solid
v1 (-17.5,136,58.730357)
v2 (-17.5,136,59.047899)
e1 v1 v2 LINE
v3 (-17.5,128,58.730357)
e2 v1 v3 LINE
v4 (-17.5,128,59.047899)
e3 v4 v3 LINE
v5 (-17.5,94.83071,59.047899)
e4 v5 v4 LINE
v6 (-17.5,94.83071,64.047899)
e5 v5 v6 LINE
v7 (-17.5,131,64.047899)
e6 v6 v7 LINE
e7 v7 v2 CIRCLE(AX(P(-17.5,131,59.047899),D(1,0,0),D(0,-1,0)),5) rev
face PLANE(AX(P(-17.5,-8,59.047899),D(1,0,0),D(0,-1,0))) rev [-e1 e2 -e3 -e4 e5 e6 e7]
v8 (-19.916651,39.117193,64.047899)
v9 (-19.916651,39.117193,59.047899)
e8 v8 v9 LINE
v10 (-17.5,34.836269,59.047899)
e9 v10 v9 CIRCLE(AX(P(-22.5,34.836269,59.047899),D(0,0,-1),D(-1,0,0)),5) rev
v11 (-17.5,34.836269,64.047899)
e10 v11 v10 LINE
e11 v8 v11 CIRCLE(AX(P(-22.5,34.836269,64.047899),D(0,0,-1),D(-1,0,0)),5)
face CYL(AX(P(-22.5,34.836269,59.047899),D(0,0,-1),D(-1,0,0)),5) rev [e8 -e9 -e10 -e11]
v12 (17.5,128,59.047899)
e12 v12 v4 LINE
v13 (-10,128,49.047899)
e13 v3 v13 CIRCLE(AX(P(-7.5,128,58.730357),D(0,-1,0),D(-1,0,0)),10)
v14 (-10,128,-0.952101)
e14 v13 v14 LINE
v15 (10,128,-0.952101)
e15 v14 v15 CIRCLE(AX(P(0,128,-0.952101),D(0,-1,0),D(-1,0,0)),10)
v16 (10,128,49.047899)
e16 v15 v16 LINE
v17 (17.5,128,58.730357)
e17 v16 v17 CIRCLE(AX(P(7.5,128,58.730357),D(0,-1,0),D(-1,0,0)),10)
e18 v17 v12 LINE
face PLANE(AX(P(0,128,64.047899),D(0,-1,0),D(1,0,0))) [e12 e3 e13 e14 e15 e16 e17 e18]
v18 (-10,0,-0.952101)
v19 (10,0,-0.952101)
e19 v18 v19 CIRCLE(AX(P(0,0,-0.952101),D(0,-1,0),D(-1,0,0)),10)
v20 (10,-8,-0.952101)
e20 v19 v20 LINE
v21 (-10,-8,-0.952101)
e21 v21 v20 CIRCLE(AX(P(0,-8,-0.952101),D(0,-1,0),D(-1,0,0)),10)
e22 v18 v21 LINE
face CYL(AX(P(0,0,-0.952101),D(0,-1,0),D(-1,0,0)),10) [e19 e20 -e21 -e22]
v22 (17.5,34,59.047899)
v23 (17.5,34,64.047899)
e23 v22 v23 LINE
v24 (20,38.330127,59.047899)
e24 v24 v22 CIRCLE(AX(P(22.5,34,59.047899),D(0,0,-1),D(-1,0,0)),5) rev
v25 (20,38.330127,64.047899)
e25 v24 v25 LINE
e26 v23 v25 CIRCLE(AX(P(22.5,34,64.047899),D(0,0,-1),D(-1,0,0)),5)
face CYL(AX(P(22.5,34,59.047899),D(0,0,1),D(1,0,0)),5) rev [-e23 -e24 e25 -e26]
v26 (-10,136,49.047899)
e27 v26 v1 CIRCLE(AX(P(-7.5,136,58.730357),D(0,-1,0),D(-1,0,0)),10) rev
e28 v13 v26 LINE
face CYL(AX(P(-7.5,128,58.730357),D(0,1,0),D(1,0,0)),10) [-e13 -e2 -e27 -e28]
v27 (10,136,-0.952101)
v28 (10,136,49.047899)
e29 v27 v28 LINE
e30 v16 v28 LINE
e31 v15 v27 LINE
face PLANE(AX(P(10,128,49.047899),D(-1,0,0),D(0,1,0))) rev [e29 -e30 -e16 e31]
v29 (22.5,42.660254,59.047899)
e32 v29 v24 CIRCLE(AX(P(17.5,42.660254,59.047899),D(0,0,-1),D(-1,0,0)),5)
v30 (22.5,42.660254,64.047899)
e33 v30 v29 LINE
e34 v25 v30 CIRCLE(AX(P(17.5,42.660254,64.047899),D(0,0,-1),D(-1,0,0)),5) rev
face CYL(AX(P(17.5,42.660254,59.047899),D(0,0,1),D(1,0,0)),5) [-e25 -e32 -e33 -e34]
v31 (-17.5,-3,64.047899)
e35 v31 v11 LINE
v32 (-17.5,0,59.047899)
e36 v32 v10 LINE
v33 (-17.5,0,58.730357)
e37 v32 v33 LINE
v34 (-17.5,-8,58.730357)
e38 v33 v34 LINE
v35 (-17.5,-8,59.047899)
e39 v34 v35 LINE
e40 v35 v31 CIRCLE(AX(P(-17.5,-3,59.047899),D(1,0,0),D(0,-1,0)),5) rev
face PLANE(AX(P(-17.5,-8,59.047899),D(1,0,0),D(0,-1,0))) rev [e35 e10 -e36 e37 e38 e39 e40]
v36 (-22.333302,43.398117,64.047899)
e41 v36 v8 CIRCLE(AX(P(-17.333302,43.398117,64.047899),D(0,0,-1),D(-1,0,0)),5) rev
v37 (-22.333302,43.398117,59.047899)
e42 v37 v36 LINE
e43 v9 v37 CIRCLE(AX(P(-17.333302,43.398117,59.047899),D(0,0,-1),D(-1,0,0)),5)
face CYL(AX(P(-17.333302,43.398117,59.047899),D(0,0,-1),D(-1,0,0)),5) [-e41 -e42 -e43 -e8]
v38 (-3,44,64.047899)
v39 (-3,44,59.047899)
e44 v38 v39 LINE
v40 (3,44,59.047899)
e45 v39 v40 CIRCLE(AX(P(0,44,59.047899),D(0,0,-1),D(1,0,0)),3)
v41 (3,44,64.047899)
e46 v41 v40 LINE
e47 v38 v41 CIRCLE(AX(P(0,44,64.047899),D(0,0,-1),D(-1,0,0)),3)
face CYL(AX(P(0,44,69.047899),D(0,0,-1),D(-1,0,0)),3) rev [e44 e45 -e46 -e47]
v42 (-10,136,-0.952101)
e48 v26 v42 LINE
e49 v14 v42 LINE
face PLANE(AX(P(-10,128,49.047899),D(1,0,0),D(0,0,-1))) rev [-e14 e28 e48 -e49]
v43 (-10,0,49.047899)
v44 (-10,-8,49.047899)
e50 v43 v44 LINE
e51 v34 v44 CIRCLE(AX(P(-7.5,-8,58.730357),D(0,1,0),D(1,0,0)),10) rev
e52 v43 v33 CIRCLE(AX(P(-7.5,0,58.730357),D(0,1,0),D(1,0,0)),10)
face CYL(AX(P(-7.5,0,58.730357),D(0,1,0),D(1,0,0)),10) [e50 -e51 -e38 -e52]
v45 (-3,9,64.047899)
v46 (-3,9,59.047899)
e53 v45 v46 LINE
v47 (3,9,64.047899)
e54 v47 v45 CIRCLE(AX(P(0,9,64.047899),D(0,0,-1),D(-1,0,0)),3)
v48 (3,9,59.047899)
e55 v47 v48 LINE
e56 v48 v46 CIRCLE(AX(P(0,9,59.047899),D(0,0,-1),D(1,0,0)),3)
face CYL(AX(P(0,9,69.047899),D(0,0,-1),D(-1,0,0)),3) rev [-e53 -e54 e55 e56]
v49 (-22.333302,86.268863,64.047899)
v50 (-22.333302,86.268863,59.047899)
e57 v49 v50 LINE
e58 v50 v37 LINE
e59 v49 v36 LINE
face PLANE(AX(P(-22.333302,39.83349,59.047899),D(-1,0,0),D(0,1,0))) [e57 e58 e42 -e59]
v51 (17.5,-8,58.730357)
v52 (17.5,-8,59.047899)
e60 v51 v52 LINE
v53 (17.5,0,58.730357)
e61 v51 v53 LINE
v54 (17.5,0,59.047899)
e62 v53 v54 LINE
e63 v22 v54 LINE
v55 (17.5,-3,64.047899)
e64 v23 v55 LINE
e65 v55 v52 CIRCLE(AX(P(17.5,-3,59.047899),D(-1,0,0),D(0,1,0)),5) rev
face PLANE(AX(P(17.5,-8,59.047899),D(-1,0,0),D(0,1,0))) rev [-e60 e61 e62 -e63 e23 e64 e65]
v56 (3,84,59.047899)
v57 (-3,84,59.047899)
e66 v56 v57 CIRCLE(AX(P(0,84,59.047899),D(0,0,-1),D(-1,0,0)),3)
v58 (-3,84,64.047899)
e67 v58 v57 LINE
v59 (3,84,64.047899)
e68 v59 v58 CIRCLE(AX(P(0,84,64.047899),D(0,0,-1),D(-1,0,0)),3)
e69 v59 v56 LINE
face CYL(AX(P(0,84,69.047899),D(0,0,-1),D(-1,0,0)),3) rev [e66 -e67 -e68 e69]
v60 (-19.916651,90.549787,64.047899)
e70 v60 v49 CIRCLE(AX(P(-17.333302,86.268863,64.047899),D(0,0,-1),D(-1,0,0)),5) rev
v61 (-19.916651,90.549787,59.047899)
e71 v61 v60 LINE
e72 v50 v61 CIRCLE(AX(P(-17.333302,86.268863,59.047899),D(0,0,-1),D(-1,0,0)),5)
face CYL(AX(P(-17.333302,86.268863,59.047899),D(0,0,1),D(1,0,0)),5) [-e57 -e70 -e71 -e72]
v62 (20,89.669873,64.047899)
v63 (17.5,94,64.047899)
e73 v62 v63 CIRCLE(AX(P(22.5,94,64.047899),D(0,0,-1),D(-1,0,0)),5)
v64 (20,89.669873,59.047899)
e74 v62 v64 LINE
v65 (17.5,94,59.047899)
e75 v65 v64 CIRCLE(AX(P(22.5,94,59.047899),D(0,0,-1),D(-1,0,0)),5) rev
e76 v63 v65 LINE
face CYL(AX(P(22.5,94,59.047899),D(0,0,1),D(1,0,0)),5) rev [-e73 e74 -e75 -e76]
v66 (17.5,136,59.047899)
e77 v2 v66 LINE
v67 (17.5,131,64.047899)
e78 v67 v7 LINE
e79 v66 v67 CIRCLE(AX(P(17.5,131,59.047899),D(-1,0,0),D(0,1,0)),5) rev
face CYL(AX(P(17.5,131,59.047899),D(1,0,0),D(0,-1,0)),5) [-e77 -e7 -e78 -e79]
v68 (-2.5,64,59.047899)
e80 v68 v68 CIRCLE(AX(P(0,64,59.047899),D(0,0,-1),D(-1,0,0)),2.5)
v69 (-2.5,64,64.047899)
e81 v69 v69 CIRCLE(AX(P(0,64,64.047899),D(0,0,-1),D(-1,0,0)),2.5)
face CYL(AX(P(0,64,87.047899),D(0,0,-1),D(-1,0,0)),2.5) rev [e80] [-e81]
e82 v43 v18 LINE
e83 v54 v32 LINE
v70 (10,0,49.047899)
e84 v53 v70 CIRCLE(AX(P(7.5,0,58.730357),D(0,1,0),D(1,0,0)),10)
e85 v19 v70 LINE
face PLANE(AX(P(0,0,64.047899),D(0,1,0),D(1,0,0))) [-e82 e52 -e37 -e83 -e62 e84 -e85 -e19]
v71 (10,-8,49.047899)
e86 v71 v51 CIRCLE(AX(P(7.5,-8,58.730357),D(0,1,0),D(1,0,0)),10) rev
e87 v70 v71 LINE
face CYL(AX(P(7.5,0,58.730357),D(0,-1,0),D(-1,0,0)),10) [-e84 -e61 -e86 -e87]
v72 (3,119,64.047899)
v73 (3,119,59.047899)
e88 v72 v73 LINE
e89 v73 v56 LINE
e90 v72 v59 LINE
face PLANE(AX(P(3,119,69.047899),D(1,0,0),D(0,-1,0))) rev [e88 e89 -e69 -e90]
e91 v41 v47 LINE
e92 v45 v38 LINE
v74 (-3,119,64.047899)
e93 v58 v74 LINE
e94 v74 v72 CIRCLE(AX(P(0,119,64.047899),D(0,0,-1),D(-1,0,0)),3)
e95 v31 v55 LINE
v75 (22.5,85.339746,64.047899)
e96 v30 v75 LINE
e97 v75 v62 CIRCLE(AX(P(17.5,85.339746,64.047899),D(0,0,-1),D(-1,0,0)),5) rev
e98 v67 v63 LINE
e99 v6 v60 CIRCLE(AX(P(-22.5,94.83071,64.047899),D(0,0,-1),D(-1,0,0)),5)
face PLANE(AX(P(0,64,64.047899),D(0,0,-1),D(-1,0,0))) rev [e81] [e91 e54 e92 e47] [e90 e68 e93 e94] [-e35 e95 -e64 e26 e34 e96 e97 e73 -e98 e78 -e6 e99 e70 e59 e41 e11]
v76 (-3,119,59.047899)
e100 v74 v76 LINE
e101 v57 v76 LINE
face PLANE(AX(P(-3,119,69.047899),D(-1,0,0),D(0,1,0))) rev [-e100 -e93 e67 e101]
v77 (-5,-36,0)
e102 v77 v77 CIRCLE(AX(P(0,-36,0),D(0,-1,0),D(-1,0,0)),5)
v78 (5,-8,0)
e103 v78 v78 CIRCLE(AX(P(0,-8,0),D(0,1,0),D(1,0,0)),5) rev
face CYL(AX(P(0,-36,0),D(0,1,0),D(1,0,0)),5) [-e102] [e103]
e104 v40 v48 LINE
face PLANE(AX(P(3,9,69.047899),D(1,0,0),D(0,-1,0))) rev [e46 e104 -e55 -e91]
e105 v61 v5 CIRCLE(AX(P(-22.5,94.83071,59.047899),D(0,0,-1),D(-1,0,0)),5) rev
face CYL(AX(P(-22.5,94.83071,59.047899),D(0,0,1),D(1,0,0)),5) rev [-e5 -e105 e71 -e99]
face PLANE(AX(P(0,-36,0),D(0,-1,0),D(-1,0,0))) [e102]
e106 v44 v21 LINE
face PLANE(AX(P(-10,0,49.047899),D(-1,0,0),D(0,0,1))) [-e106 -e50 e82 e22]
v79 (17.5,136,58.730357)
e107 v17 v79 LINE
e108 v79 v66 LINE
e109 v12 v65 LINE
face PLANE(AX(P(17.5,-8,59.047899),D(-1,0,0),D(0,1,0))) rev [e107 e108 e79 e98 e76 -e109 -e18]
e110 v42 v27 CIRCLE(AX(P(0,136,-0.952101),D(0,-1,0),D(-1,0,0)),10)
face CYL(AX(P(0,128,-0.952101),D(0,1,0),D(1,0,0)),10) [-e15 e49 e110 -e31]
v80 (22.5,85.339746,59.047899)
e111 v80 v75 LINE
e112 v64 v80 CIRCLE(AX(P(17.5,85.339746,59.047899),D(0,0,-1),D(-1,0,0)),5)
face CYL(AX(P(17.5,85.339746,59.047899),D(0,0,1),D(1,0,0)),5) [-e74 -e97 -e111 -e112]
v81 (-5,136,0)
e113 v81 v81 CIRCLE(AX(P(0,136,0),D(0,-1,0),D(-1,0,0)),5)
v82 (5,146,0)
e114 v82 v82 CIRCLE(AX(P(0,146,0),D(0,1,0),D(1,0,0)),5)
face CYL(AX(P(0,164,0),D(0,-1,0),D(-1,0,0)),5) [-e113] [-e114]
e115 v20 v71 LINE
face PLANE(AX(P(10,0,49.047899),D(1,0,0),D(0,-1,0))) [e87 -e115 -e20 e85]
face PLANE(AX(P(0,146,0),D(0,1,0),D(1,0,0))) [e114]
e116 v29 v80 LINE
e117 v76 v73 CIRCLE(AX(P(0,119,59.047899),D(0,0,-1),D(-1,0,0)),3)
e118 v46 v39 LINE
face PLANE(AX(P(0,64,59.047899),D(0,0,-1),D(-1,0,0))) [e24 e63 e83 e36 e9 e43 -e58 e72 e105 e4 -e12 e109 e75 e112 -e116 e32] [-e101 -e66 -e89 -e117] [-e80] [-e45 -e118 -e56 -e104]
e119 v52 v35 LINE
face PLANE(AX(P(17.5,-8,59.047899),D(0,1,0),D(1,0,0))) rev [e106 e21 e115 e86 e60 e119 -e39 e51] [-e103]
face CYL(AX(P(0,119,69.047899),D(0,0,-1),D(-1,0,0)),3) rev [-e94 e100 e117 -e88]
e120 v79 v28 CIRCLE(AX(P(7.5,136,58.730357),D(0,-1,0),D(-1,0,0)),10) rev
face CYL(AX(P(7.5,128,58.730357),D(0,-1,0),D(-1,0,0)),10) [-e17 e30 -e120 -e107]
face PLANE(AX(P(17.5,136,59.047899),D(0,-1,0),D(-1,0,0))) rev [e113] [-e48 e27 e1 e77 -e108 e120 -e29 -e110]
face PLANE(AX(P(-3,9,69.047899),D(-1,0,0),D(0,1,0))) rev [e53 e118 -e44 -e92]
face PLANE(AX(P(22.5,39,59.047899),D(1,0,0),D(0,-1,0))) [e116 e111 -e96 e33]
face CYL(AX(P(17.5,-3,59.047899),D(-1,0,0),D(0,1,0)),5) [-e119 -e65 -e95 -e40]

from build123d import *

# Parameters (mm, degrees)
SKETCH1_W             = 144
SKETCH1_H             = 35
BOSS_EXTRUDE1_DEPTH   = 5
BOSS_EXTRUDE2_DEPTH   = 8
FILLET1_R             = 10
BOSS_EXTRUDE3_DEPTH   = 8
SKETCH5_R             = 5
BOSS_EXTRUDE4_DEPTH   = 28
FILLET1_OF_MIRROR1_R  = 10
FILLET3_R             = 5
SKETCH7_R             = 2.5
CUT_EXTRUDE2_DEPTH    = 28
SKETCH8_R             = 5
CUT_EXTRUDE3_DEPTH    = 18
SKETCH9_W             = 50
SKETCH9_H             = 4.833302034
BOSS_EXTRUDE7_DEPTH   = 5
FILLET6_R             = 5
FILLET7_R             = 5
SKETCH10_W            = 50
SKETCH10_H            = 5
BOSS_EXTRUDE8_DEPTH   = 5
FILLET8_R             = 5
FILLET9_R             = 5
CUT_EXTRUDE6_DEPTH    = 10
BODY_MOVE_COPY1_ANGLE = 120


with BuildPart() as part:
    # Sketch1 → Boss-Extrude1 (new body)
    with BuildSketch(Plane(origin=(0, 0, 0), x_dir=(1, 0, 0), z_dir=(0, 1, 0))):
        Rectangle(SKETCH1_W, SKETCH1_H)
    boss_extrude1 = extrude(amount=BOSS_EXTRUDE1_DEPTH)

    # Sketch3 → Boss-Extrude2 (add)
    with BuildSketch(Plane.ZY.offset(72)):
        Polygon((-17.5, 5), (-17.5, 15), (-10, 15), (-10, 55), (10, 55), (10, 15), (17.5, 15), (17.5, 5), (0, 5), align=None)
    boss_extrude2 = extrude(amount=-BOSS_EXTRUDE2_DEPTH)

    # Fillet1
    # the kernel refuses this fillet: 10 mm, written as the material it takes off along each edge
    with BuildSketch(Plane(origin=(-96.206145914, 15, -17.5), x_dir=(0, -1, 0), z_dir=(1, 0, 0))) as fillet1_piece_1:
        with BuildLine():
            CenterArc((9.682458366, -10), FILLET1_R, 90, 75.522487814)
            Line((0, -7.5), (-0.193649167, -7.45))
            ThreePointArc((-0.193649167, -7.45), (-0.2, -3.75), (-0.2, 0))
            Line((-0.2, 0), (0, 0.2))
            Line((0, 0.2), (9.682458366, 0.2))
            Line((9.682458366, 0.2), (9.682458366, 0))
        make_face()
    extrude(amount=56.412291828, mode=Mode.SUBTRACT)
    with BuildSketch(Plane(origin=(-96.206145914, 15, 17.5), x_dir=(0, -1, 0), z_dir=(1, 0, 0))) as fillet1_piece_2:
        with BuildLine():
            CenterArc((9.682458366, 10), FILLET1_R, 194.477512186, 75.522487814)
            Line((0, 7.5), (-0.193649167, 7.45))
            ThreePointArc((-0.193649167, 7.45), (-0.2, 3.75), (-0.2, 0))
            Line((-0.2, 0), (0, -0.2))
            Line((0, -0.2), (9.682458366, -0.2))
            Line((9.682458366, -0.2), (9.682458366, 0))
        make_face()
    extrude(amount=56.412291828, mode=Mode.SUBTRACT)

    # Sketch4 → Boss-Extrude3 (add)
    with BuildSketch(Plane.ZY.offset(72)):
        with BuildLine():
            Line((-10, 55), (-10, 65))
            ThreePointArc((-10, 65), (0, 75), (10, 65))
            Line((10, 65), (10, 55))
            Line((10, 55), (-10, 55))
        make_face()
    boss_extrude3 = extrude(amount=-BOSS_EXTRUDE3_DEPTH)

    # Sketch5 → Boss-Extrude4 (add)
    with BuildSketch(Plane.ZY.offset(72)):
        with Locations(Location((0, 64.047898896, 0), (0, 0, 180))):
            Circle(SKETCH5_R)
    boss_extrude4 = extrude(amount=BOSS_EXTRUDE4_DEPTH)

    # Mirror1: Boss-Extrude1, Boss-Extrude2, Boss-Extrude3, Boss-Extrude4 across plane
    add(boss_extrude1.mirror(Plane(origin=(0, 0, 0), x_dir=(0, 0, 1), z_dir=(1, 0, 0))))
    add(boss_extrude2.mirror(Plane(origin=(0, 0, 0), x_dir=(0, 0, 1), z_dir=(1, 0, 0))))
    add(boss_extrude3.mirror(Plane(origin=(0, 0, 0), x_dir=(0, 0, 1), z_dir=(1, 0, 0))))
    add(boss_extrude4.mirror(Plane(origin=(0, 0, 0), x_dir=(0, 0, 1), z_dir=(1, 0, 0))))

    # Fillet1 of Mirror1
    # the kernel refuses this fillet: 10 mm, written as the material it takes off along each edge
    with BuildSketch(Plane(origin=(96.206145914, 15, -17.5), x_dir=(0, -1, 0), z_dir=(-1, 0, 0))) as fillet1_of_mirror1_piece_1:
        with BuildLine():
            CenterArc((9.682458366, 10), FILLET1_OF_MIRROR1_R, 194.477512186, 75.522487814)
            Line((0, 7.5), (-0.193649167, 7.45))
            ThreePointArc((-0.193649167, 7.45), (-0.2, 3.75), (-0.2, 0))
            Line((-0.2, 0), (0, -0.2))
            Line((0, -0.2), (9.682458366, -0.2))
            Line((9.682458366, -0.2), (9.682458366, 0))
        make_face()
    extrude(amount=56.412291828, mode=Mode.SUBTRACT)
    with BuildSketch(Plane(origin=(96.206145914, 15, 17.5), x_dir=(0, -1, 0), z_dir=(-1, 0, 0))) as fillet1_of_mirror1_piece_2:
        with BuildLine():
            CenterArc((9.682458366, -10), FILLET1_OF_MIRROR1_R, 90, 75.522487814)
            Line((0, -7.5), (-0.193649167, -7.45))
            ThreePointArc((-0.193649167, -7.45), (-0.2, -3.75), (-0.2, 0))
            Line((-0.2, 0), (0, 0.2))
            Line((0, 0.2), (9.682458366, 0.2))
            Line((9.682458366, 0.2), (9.682458366, 0))
        make_face()
    extrude(amount=56.412291828, mode=Mode.SUBTRACT)

    # Fillet3
    fillet3_edges = [part.edges().sort_by_distance(p)[0] for p in [
        (-72, 0, 0),
        (72, 0, 0),
    ]]
    fillet(fillet3_edges, radius=FILLET3_R)

    # Sketch7 → Cut-Extrude2 (cut)
    with BuildSketch(Plane(origin=(0, 5, 0), x_dir=(1, 0, 0), z_dir=(0, 1, 0))):
        with Locations(Location((0, 0, 0), (0, 0, 270))):
            Circle(SKETCH7_R)
    extrude(amount=-CUT_EXTRUDE2_DEPTH, mode=Mode.SUBTRACT)

    # Sketch8 → Cut-Extrude3 (cut)
    with BuildSketch(Plane(origin=(100, 0, 0), x_dir=(0, 0, -1), z_dir=(1, 0, 0))):
        with Locations(Location((0, 64.047898896, 0), (0, 0, 180))):
            Circle(SKETCH8_R)
    extrude(amount=-CUT_EXTRUDE3_DEPTH, mode=Mode.SUBTRACT)

    # Sketch9 → Boss-Extrude7 (add)
    with BuildSketch(Plane.XZ):
        with Locations((0.833489832, 19.916651017)):
            Rectangle(SKETCH9_W, SKETCH9_H)
    extrude(amount=-BOSS_EXTRUDE7_DEPTH)

    # Fillet6
    # the kernel refuses this fillet: 5 mm, written as the material it adds along each edge
    with BuildSketch(Plane(origin=(-24.166510168, 0, 17.5), x_dir=(-1, 0, 0), z_dir=(0, 1, 0))) as fillet6_piece_1:
        with BuildLine():
            CenterArc((4.997220406, 5), FILLET6_R, 181.91057204, 88.08942796)
            Line((0, 4.833302034), (-0.099944408, 4.829968074))
            ThreePointArc((-0.099944408, 4.829968074), (-0.1, 2.416651017), (-0.1, 0))
            Line((-0.1, 0), (0, -0.1))
            Line((0, -0.1), (4.997220406, -0.1))
            Line((4.997220406, -0.1), (4.997220406, 0))
        make_face()
    extrude(amount=5)
    with BuildSketch(Plane(origin=(25.833489832, 0, 17.5), x_dir=(1, 0, 0), z_dir=(0, 1, 0))) as fillet6_piece_2:
        with BuildLine():
            CenterArc((4.997220406, -5), FILLET6_R, 90, 88.08942796)
            Line((0, -4.833302034), (-0.099944408, -4.829968074))
            ThreePointArc((-0.099944408, -4.829968074), (-0.1, -2.416651017), (-0.1, 0))
            Line((-0.1, 0), (0, 0.1))
            Line((0, 0.1), (4.997220406, 0.1))
            Line((4.997220406, 0.1), (4.997220406, 0))
        make_face()
    extrude(amount=5)

    # Fillet7
    fillet7_edges = [part.edges().sort_by_distance(p)[0] for p in [
        (-24.166510168, 2.5, 22.333302034),
        (25.833489832, 2.5, 22.333302034),
    ]]
    fillet(fillet7_edges, radius=FILLET7_R)

    # Sketch10 → Boss-Extrude8 (add)
    with BuildSketch(Plane.XZ):
        with Locations((0, -20)):
            Rectangle(SKETCH10_W, SKETCH10_H)
    extrude(amount=-BOSS_EXTRUDE8_DEPTH)

    # Fillet8
    fillet8_edges = [part.edges().sort_by_distance(p)[0] for p in [
        (-25, 2.5, -17.5),
        (25, 2.5, -17.5),
    ]]
    fillet(fillet8_edges, radius=FILLET8_R - 0.0001)  # a hair under: the kernel refuses the full size

    # Fillet9
    fillet9_edges = [part.edges().sort_by_distance(p)[0] for p in [
        (-25, 2.5, -22.5),
        (25, 2.5, -22.5),
    ]]
    fillet(fillet9_edges, radius=FILLET9_R)

    # Sketch11 → Cut-Extrude6 (cut)
    with BuildSketch(Plane(origin=(0, 5, 0), x_dir=(1, 0, 0), z_dir=(0, 1, 0))):
        with BuildLine():
            Line((55, -3), (20, -3))
            ThreePointArc((20, -3), (17, 0), (20, 3))
            Line((20, 3), (55, 3))
            ThreePointArc((55, 3), (58, 0), (55, -3))
        make_face()
        with BuildLine():
            Line((-55, -3), (-20, -3))
            ThreePointArc((-20, -3), (-17, 0), (-20, 3))
            Line((-20, 3), (-55, 3))
            ThreePointArc((-55, 3), (-58, 0), (-55, -3))
        make_face()
    extrude(amount=-CUT_EXTRUDE6_DEPTH, mode=Mode.SUBTRACT)


with BuildPart() as part_1:
    # Body-Move/Copy1: read off the stored shape, not the designer's step
    # Body-Move/Copy1: moved
    add(part.part.moved(Location((64, -64.0478989, 0))).rotate(Axis((0, 0, 0), (-0.5773502692, -0.5773502692, 0.5773502692)), BODY_MOVE_COPY1_ANGLE))


solid = part_1.part
